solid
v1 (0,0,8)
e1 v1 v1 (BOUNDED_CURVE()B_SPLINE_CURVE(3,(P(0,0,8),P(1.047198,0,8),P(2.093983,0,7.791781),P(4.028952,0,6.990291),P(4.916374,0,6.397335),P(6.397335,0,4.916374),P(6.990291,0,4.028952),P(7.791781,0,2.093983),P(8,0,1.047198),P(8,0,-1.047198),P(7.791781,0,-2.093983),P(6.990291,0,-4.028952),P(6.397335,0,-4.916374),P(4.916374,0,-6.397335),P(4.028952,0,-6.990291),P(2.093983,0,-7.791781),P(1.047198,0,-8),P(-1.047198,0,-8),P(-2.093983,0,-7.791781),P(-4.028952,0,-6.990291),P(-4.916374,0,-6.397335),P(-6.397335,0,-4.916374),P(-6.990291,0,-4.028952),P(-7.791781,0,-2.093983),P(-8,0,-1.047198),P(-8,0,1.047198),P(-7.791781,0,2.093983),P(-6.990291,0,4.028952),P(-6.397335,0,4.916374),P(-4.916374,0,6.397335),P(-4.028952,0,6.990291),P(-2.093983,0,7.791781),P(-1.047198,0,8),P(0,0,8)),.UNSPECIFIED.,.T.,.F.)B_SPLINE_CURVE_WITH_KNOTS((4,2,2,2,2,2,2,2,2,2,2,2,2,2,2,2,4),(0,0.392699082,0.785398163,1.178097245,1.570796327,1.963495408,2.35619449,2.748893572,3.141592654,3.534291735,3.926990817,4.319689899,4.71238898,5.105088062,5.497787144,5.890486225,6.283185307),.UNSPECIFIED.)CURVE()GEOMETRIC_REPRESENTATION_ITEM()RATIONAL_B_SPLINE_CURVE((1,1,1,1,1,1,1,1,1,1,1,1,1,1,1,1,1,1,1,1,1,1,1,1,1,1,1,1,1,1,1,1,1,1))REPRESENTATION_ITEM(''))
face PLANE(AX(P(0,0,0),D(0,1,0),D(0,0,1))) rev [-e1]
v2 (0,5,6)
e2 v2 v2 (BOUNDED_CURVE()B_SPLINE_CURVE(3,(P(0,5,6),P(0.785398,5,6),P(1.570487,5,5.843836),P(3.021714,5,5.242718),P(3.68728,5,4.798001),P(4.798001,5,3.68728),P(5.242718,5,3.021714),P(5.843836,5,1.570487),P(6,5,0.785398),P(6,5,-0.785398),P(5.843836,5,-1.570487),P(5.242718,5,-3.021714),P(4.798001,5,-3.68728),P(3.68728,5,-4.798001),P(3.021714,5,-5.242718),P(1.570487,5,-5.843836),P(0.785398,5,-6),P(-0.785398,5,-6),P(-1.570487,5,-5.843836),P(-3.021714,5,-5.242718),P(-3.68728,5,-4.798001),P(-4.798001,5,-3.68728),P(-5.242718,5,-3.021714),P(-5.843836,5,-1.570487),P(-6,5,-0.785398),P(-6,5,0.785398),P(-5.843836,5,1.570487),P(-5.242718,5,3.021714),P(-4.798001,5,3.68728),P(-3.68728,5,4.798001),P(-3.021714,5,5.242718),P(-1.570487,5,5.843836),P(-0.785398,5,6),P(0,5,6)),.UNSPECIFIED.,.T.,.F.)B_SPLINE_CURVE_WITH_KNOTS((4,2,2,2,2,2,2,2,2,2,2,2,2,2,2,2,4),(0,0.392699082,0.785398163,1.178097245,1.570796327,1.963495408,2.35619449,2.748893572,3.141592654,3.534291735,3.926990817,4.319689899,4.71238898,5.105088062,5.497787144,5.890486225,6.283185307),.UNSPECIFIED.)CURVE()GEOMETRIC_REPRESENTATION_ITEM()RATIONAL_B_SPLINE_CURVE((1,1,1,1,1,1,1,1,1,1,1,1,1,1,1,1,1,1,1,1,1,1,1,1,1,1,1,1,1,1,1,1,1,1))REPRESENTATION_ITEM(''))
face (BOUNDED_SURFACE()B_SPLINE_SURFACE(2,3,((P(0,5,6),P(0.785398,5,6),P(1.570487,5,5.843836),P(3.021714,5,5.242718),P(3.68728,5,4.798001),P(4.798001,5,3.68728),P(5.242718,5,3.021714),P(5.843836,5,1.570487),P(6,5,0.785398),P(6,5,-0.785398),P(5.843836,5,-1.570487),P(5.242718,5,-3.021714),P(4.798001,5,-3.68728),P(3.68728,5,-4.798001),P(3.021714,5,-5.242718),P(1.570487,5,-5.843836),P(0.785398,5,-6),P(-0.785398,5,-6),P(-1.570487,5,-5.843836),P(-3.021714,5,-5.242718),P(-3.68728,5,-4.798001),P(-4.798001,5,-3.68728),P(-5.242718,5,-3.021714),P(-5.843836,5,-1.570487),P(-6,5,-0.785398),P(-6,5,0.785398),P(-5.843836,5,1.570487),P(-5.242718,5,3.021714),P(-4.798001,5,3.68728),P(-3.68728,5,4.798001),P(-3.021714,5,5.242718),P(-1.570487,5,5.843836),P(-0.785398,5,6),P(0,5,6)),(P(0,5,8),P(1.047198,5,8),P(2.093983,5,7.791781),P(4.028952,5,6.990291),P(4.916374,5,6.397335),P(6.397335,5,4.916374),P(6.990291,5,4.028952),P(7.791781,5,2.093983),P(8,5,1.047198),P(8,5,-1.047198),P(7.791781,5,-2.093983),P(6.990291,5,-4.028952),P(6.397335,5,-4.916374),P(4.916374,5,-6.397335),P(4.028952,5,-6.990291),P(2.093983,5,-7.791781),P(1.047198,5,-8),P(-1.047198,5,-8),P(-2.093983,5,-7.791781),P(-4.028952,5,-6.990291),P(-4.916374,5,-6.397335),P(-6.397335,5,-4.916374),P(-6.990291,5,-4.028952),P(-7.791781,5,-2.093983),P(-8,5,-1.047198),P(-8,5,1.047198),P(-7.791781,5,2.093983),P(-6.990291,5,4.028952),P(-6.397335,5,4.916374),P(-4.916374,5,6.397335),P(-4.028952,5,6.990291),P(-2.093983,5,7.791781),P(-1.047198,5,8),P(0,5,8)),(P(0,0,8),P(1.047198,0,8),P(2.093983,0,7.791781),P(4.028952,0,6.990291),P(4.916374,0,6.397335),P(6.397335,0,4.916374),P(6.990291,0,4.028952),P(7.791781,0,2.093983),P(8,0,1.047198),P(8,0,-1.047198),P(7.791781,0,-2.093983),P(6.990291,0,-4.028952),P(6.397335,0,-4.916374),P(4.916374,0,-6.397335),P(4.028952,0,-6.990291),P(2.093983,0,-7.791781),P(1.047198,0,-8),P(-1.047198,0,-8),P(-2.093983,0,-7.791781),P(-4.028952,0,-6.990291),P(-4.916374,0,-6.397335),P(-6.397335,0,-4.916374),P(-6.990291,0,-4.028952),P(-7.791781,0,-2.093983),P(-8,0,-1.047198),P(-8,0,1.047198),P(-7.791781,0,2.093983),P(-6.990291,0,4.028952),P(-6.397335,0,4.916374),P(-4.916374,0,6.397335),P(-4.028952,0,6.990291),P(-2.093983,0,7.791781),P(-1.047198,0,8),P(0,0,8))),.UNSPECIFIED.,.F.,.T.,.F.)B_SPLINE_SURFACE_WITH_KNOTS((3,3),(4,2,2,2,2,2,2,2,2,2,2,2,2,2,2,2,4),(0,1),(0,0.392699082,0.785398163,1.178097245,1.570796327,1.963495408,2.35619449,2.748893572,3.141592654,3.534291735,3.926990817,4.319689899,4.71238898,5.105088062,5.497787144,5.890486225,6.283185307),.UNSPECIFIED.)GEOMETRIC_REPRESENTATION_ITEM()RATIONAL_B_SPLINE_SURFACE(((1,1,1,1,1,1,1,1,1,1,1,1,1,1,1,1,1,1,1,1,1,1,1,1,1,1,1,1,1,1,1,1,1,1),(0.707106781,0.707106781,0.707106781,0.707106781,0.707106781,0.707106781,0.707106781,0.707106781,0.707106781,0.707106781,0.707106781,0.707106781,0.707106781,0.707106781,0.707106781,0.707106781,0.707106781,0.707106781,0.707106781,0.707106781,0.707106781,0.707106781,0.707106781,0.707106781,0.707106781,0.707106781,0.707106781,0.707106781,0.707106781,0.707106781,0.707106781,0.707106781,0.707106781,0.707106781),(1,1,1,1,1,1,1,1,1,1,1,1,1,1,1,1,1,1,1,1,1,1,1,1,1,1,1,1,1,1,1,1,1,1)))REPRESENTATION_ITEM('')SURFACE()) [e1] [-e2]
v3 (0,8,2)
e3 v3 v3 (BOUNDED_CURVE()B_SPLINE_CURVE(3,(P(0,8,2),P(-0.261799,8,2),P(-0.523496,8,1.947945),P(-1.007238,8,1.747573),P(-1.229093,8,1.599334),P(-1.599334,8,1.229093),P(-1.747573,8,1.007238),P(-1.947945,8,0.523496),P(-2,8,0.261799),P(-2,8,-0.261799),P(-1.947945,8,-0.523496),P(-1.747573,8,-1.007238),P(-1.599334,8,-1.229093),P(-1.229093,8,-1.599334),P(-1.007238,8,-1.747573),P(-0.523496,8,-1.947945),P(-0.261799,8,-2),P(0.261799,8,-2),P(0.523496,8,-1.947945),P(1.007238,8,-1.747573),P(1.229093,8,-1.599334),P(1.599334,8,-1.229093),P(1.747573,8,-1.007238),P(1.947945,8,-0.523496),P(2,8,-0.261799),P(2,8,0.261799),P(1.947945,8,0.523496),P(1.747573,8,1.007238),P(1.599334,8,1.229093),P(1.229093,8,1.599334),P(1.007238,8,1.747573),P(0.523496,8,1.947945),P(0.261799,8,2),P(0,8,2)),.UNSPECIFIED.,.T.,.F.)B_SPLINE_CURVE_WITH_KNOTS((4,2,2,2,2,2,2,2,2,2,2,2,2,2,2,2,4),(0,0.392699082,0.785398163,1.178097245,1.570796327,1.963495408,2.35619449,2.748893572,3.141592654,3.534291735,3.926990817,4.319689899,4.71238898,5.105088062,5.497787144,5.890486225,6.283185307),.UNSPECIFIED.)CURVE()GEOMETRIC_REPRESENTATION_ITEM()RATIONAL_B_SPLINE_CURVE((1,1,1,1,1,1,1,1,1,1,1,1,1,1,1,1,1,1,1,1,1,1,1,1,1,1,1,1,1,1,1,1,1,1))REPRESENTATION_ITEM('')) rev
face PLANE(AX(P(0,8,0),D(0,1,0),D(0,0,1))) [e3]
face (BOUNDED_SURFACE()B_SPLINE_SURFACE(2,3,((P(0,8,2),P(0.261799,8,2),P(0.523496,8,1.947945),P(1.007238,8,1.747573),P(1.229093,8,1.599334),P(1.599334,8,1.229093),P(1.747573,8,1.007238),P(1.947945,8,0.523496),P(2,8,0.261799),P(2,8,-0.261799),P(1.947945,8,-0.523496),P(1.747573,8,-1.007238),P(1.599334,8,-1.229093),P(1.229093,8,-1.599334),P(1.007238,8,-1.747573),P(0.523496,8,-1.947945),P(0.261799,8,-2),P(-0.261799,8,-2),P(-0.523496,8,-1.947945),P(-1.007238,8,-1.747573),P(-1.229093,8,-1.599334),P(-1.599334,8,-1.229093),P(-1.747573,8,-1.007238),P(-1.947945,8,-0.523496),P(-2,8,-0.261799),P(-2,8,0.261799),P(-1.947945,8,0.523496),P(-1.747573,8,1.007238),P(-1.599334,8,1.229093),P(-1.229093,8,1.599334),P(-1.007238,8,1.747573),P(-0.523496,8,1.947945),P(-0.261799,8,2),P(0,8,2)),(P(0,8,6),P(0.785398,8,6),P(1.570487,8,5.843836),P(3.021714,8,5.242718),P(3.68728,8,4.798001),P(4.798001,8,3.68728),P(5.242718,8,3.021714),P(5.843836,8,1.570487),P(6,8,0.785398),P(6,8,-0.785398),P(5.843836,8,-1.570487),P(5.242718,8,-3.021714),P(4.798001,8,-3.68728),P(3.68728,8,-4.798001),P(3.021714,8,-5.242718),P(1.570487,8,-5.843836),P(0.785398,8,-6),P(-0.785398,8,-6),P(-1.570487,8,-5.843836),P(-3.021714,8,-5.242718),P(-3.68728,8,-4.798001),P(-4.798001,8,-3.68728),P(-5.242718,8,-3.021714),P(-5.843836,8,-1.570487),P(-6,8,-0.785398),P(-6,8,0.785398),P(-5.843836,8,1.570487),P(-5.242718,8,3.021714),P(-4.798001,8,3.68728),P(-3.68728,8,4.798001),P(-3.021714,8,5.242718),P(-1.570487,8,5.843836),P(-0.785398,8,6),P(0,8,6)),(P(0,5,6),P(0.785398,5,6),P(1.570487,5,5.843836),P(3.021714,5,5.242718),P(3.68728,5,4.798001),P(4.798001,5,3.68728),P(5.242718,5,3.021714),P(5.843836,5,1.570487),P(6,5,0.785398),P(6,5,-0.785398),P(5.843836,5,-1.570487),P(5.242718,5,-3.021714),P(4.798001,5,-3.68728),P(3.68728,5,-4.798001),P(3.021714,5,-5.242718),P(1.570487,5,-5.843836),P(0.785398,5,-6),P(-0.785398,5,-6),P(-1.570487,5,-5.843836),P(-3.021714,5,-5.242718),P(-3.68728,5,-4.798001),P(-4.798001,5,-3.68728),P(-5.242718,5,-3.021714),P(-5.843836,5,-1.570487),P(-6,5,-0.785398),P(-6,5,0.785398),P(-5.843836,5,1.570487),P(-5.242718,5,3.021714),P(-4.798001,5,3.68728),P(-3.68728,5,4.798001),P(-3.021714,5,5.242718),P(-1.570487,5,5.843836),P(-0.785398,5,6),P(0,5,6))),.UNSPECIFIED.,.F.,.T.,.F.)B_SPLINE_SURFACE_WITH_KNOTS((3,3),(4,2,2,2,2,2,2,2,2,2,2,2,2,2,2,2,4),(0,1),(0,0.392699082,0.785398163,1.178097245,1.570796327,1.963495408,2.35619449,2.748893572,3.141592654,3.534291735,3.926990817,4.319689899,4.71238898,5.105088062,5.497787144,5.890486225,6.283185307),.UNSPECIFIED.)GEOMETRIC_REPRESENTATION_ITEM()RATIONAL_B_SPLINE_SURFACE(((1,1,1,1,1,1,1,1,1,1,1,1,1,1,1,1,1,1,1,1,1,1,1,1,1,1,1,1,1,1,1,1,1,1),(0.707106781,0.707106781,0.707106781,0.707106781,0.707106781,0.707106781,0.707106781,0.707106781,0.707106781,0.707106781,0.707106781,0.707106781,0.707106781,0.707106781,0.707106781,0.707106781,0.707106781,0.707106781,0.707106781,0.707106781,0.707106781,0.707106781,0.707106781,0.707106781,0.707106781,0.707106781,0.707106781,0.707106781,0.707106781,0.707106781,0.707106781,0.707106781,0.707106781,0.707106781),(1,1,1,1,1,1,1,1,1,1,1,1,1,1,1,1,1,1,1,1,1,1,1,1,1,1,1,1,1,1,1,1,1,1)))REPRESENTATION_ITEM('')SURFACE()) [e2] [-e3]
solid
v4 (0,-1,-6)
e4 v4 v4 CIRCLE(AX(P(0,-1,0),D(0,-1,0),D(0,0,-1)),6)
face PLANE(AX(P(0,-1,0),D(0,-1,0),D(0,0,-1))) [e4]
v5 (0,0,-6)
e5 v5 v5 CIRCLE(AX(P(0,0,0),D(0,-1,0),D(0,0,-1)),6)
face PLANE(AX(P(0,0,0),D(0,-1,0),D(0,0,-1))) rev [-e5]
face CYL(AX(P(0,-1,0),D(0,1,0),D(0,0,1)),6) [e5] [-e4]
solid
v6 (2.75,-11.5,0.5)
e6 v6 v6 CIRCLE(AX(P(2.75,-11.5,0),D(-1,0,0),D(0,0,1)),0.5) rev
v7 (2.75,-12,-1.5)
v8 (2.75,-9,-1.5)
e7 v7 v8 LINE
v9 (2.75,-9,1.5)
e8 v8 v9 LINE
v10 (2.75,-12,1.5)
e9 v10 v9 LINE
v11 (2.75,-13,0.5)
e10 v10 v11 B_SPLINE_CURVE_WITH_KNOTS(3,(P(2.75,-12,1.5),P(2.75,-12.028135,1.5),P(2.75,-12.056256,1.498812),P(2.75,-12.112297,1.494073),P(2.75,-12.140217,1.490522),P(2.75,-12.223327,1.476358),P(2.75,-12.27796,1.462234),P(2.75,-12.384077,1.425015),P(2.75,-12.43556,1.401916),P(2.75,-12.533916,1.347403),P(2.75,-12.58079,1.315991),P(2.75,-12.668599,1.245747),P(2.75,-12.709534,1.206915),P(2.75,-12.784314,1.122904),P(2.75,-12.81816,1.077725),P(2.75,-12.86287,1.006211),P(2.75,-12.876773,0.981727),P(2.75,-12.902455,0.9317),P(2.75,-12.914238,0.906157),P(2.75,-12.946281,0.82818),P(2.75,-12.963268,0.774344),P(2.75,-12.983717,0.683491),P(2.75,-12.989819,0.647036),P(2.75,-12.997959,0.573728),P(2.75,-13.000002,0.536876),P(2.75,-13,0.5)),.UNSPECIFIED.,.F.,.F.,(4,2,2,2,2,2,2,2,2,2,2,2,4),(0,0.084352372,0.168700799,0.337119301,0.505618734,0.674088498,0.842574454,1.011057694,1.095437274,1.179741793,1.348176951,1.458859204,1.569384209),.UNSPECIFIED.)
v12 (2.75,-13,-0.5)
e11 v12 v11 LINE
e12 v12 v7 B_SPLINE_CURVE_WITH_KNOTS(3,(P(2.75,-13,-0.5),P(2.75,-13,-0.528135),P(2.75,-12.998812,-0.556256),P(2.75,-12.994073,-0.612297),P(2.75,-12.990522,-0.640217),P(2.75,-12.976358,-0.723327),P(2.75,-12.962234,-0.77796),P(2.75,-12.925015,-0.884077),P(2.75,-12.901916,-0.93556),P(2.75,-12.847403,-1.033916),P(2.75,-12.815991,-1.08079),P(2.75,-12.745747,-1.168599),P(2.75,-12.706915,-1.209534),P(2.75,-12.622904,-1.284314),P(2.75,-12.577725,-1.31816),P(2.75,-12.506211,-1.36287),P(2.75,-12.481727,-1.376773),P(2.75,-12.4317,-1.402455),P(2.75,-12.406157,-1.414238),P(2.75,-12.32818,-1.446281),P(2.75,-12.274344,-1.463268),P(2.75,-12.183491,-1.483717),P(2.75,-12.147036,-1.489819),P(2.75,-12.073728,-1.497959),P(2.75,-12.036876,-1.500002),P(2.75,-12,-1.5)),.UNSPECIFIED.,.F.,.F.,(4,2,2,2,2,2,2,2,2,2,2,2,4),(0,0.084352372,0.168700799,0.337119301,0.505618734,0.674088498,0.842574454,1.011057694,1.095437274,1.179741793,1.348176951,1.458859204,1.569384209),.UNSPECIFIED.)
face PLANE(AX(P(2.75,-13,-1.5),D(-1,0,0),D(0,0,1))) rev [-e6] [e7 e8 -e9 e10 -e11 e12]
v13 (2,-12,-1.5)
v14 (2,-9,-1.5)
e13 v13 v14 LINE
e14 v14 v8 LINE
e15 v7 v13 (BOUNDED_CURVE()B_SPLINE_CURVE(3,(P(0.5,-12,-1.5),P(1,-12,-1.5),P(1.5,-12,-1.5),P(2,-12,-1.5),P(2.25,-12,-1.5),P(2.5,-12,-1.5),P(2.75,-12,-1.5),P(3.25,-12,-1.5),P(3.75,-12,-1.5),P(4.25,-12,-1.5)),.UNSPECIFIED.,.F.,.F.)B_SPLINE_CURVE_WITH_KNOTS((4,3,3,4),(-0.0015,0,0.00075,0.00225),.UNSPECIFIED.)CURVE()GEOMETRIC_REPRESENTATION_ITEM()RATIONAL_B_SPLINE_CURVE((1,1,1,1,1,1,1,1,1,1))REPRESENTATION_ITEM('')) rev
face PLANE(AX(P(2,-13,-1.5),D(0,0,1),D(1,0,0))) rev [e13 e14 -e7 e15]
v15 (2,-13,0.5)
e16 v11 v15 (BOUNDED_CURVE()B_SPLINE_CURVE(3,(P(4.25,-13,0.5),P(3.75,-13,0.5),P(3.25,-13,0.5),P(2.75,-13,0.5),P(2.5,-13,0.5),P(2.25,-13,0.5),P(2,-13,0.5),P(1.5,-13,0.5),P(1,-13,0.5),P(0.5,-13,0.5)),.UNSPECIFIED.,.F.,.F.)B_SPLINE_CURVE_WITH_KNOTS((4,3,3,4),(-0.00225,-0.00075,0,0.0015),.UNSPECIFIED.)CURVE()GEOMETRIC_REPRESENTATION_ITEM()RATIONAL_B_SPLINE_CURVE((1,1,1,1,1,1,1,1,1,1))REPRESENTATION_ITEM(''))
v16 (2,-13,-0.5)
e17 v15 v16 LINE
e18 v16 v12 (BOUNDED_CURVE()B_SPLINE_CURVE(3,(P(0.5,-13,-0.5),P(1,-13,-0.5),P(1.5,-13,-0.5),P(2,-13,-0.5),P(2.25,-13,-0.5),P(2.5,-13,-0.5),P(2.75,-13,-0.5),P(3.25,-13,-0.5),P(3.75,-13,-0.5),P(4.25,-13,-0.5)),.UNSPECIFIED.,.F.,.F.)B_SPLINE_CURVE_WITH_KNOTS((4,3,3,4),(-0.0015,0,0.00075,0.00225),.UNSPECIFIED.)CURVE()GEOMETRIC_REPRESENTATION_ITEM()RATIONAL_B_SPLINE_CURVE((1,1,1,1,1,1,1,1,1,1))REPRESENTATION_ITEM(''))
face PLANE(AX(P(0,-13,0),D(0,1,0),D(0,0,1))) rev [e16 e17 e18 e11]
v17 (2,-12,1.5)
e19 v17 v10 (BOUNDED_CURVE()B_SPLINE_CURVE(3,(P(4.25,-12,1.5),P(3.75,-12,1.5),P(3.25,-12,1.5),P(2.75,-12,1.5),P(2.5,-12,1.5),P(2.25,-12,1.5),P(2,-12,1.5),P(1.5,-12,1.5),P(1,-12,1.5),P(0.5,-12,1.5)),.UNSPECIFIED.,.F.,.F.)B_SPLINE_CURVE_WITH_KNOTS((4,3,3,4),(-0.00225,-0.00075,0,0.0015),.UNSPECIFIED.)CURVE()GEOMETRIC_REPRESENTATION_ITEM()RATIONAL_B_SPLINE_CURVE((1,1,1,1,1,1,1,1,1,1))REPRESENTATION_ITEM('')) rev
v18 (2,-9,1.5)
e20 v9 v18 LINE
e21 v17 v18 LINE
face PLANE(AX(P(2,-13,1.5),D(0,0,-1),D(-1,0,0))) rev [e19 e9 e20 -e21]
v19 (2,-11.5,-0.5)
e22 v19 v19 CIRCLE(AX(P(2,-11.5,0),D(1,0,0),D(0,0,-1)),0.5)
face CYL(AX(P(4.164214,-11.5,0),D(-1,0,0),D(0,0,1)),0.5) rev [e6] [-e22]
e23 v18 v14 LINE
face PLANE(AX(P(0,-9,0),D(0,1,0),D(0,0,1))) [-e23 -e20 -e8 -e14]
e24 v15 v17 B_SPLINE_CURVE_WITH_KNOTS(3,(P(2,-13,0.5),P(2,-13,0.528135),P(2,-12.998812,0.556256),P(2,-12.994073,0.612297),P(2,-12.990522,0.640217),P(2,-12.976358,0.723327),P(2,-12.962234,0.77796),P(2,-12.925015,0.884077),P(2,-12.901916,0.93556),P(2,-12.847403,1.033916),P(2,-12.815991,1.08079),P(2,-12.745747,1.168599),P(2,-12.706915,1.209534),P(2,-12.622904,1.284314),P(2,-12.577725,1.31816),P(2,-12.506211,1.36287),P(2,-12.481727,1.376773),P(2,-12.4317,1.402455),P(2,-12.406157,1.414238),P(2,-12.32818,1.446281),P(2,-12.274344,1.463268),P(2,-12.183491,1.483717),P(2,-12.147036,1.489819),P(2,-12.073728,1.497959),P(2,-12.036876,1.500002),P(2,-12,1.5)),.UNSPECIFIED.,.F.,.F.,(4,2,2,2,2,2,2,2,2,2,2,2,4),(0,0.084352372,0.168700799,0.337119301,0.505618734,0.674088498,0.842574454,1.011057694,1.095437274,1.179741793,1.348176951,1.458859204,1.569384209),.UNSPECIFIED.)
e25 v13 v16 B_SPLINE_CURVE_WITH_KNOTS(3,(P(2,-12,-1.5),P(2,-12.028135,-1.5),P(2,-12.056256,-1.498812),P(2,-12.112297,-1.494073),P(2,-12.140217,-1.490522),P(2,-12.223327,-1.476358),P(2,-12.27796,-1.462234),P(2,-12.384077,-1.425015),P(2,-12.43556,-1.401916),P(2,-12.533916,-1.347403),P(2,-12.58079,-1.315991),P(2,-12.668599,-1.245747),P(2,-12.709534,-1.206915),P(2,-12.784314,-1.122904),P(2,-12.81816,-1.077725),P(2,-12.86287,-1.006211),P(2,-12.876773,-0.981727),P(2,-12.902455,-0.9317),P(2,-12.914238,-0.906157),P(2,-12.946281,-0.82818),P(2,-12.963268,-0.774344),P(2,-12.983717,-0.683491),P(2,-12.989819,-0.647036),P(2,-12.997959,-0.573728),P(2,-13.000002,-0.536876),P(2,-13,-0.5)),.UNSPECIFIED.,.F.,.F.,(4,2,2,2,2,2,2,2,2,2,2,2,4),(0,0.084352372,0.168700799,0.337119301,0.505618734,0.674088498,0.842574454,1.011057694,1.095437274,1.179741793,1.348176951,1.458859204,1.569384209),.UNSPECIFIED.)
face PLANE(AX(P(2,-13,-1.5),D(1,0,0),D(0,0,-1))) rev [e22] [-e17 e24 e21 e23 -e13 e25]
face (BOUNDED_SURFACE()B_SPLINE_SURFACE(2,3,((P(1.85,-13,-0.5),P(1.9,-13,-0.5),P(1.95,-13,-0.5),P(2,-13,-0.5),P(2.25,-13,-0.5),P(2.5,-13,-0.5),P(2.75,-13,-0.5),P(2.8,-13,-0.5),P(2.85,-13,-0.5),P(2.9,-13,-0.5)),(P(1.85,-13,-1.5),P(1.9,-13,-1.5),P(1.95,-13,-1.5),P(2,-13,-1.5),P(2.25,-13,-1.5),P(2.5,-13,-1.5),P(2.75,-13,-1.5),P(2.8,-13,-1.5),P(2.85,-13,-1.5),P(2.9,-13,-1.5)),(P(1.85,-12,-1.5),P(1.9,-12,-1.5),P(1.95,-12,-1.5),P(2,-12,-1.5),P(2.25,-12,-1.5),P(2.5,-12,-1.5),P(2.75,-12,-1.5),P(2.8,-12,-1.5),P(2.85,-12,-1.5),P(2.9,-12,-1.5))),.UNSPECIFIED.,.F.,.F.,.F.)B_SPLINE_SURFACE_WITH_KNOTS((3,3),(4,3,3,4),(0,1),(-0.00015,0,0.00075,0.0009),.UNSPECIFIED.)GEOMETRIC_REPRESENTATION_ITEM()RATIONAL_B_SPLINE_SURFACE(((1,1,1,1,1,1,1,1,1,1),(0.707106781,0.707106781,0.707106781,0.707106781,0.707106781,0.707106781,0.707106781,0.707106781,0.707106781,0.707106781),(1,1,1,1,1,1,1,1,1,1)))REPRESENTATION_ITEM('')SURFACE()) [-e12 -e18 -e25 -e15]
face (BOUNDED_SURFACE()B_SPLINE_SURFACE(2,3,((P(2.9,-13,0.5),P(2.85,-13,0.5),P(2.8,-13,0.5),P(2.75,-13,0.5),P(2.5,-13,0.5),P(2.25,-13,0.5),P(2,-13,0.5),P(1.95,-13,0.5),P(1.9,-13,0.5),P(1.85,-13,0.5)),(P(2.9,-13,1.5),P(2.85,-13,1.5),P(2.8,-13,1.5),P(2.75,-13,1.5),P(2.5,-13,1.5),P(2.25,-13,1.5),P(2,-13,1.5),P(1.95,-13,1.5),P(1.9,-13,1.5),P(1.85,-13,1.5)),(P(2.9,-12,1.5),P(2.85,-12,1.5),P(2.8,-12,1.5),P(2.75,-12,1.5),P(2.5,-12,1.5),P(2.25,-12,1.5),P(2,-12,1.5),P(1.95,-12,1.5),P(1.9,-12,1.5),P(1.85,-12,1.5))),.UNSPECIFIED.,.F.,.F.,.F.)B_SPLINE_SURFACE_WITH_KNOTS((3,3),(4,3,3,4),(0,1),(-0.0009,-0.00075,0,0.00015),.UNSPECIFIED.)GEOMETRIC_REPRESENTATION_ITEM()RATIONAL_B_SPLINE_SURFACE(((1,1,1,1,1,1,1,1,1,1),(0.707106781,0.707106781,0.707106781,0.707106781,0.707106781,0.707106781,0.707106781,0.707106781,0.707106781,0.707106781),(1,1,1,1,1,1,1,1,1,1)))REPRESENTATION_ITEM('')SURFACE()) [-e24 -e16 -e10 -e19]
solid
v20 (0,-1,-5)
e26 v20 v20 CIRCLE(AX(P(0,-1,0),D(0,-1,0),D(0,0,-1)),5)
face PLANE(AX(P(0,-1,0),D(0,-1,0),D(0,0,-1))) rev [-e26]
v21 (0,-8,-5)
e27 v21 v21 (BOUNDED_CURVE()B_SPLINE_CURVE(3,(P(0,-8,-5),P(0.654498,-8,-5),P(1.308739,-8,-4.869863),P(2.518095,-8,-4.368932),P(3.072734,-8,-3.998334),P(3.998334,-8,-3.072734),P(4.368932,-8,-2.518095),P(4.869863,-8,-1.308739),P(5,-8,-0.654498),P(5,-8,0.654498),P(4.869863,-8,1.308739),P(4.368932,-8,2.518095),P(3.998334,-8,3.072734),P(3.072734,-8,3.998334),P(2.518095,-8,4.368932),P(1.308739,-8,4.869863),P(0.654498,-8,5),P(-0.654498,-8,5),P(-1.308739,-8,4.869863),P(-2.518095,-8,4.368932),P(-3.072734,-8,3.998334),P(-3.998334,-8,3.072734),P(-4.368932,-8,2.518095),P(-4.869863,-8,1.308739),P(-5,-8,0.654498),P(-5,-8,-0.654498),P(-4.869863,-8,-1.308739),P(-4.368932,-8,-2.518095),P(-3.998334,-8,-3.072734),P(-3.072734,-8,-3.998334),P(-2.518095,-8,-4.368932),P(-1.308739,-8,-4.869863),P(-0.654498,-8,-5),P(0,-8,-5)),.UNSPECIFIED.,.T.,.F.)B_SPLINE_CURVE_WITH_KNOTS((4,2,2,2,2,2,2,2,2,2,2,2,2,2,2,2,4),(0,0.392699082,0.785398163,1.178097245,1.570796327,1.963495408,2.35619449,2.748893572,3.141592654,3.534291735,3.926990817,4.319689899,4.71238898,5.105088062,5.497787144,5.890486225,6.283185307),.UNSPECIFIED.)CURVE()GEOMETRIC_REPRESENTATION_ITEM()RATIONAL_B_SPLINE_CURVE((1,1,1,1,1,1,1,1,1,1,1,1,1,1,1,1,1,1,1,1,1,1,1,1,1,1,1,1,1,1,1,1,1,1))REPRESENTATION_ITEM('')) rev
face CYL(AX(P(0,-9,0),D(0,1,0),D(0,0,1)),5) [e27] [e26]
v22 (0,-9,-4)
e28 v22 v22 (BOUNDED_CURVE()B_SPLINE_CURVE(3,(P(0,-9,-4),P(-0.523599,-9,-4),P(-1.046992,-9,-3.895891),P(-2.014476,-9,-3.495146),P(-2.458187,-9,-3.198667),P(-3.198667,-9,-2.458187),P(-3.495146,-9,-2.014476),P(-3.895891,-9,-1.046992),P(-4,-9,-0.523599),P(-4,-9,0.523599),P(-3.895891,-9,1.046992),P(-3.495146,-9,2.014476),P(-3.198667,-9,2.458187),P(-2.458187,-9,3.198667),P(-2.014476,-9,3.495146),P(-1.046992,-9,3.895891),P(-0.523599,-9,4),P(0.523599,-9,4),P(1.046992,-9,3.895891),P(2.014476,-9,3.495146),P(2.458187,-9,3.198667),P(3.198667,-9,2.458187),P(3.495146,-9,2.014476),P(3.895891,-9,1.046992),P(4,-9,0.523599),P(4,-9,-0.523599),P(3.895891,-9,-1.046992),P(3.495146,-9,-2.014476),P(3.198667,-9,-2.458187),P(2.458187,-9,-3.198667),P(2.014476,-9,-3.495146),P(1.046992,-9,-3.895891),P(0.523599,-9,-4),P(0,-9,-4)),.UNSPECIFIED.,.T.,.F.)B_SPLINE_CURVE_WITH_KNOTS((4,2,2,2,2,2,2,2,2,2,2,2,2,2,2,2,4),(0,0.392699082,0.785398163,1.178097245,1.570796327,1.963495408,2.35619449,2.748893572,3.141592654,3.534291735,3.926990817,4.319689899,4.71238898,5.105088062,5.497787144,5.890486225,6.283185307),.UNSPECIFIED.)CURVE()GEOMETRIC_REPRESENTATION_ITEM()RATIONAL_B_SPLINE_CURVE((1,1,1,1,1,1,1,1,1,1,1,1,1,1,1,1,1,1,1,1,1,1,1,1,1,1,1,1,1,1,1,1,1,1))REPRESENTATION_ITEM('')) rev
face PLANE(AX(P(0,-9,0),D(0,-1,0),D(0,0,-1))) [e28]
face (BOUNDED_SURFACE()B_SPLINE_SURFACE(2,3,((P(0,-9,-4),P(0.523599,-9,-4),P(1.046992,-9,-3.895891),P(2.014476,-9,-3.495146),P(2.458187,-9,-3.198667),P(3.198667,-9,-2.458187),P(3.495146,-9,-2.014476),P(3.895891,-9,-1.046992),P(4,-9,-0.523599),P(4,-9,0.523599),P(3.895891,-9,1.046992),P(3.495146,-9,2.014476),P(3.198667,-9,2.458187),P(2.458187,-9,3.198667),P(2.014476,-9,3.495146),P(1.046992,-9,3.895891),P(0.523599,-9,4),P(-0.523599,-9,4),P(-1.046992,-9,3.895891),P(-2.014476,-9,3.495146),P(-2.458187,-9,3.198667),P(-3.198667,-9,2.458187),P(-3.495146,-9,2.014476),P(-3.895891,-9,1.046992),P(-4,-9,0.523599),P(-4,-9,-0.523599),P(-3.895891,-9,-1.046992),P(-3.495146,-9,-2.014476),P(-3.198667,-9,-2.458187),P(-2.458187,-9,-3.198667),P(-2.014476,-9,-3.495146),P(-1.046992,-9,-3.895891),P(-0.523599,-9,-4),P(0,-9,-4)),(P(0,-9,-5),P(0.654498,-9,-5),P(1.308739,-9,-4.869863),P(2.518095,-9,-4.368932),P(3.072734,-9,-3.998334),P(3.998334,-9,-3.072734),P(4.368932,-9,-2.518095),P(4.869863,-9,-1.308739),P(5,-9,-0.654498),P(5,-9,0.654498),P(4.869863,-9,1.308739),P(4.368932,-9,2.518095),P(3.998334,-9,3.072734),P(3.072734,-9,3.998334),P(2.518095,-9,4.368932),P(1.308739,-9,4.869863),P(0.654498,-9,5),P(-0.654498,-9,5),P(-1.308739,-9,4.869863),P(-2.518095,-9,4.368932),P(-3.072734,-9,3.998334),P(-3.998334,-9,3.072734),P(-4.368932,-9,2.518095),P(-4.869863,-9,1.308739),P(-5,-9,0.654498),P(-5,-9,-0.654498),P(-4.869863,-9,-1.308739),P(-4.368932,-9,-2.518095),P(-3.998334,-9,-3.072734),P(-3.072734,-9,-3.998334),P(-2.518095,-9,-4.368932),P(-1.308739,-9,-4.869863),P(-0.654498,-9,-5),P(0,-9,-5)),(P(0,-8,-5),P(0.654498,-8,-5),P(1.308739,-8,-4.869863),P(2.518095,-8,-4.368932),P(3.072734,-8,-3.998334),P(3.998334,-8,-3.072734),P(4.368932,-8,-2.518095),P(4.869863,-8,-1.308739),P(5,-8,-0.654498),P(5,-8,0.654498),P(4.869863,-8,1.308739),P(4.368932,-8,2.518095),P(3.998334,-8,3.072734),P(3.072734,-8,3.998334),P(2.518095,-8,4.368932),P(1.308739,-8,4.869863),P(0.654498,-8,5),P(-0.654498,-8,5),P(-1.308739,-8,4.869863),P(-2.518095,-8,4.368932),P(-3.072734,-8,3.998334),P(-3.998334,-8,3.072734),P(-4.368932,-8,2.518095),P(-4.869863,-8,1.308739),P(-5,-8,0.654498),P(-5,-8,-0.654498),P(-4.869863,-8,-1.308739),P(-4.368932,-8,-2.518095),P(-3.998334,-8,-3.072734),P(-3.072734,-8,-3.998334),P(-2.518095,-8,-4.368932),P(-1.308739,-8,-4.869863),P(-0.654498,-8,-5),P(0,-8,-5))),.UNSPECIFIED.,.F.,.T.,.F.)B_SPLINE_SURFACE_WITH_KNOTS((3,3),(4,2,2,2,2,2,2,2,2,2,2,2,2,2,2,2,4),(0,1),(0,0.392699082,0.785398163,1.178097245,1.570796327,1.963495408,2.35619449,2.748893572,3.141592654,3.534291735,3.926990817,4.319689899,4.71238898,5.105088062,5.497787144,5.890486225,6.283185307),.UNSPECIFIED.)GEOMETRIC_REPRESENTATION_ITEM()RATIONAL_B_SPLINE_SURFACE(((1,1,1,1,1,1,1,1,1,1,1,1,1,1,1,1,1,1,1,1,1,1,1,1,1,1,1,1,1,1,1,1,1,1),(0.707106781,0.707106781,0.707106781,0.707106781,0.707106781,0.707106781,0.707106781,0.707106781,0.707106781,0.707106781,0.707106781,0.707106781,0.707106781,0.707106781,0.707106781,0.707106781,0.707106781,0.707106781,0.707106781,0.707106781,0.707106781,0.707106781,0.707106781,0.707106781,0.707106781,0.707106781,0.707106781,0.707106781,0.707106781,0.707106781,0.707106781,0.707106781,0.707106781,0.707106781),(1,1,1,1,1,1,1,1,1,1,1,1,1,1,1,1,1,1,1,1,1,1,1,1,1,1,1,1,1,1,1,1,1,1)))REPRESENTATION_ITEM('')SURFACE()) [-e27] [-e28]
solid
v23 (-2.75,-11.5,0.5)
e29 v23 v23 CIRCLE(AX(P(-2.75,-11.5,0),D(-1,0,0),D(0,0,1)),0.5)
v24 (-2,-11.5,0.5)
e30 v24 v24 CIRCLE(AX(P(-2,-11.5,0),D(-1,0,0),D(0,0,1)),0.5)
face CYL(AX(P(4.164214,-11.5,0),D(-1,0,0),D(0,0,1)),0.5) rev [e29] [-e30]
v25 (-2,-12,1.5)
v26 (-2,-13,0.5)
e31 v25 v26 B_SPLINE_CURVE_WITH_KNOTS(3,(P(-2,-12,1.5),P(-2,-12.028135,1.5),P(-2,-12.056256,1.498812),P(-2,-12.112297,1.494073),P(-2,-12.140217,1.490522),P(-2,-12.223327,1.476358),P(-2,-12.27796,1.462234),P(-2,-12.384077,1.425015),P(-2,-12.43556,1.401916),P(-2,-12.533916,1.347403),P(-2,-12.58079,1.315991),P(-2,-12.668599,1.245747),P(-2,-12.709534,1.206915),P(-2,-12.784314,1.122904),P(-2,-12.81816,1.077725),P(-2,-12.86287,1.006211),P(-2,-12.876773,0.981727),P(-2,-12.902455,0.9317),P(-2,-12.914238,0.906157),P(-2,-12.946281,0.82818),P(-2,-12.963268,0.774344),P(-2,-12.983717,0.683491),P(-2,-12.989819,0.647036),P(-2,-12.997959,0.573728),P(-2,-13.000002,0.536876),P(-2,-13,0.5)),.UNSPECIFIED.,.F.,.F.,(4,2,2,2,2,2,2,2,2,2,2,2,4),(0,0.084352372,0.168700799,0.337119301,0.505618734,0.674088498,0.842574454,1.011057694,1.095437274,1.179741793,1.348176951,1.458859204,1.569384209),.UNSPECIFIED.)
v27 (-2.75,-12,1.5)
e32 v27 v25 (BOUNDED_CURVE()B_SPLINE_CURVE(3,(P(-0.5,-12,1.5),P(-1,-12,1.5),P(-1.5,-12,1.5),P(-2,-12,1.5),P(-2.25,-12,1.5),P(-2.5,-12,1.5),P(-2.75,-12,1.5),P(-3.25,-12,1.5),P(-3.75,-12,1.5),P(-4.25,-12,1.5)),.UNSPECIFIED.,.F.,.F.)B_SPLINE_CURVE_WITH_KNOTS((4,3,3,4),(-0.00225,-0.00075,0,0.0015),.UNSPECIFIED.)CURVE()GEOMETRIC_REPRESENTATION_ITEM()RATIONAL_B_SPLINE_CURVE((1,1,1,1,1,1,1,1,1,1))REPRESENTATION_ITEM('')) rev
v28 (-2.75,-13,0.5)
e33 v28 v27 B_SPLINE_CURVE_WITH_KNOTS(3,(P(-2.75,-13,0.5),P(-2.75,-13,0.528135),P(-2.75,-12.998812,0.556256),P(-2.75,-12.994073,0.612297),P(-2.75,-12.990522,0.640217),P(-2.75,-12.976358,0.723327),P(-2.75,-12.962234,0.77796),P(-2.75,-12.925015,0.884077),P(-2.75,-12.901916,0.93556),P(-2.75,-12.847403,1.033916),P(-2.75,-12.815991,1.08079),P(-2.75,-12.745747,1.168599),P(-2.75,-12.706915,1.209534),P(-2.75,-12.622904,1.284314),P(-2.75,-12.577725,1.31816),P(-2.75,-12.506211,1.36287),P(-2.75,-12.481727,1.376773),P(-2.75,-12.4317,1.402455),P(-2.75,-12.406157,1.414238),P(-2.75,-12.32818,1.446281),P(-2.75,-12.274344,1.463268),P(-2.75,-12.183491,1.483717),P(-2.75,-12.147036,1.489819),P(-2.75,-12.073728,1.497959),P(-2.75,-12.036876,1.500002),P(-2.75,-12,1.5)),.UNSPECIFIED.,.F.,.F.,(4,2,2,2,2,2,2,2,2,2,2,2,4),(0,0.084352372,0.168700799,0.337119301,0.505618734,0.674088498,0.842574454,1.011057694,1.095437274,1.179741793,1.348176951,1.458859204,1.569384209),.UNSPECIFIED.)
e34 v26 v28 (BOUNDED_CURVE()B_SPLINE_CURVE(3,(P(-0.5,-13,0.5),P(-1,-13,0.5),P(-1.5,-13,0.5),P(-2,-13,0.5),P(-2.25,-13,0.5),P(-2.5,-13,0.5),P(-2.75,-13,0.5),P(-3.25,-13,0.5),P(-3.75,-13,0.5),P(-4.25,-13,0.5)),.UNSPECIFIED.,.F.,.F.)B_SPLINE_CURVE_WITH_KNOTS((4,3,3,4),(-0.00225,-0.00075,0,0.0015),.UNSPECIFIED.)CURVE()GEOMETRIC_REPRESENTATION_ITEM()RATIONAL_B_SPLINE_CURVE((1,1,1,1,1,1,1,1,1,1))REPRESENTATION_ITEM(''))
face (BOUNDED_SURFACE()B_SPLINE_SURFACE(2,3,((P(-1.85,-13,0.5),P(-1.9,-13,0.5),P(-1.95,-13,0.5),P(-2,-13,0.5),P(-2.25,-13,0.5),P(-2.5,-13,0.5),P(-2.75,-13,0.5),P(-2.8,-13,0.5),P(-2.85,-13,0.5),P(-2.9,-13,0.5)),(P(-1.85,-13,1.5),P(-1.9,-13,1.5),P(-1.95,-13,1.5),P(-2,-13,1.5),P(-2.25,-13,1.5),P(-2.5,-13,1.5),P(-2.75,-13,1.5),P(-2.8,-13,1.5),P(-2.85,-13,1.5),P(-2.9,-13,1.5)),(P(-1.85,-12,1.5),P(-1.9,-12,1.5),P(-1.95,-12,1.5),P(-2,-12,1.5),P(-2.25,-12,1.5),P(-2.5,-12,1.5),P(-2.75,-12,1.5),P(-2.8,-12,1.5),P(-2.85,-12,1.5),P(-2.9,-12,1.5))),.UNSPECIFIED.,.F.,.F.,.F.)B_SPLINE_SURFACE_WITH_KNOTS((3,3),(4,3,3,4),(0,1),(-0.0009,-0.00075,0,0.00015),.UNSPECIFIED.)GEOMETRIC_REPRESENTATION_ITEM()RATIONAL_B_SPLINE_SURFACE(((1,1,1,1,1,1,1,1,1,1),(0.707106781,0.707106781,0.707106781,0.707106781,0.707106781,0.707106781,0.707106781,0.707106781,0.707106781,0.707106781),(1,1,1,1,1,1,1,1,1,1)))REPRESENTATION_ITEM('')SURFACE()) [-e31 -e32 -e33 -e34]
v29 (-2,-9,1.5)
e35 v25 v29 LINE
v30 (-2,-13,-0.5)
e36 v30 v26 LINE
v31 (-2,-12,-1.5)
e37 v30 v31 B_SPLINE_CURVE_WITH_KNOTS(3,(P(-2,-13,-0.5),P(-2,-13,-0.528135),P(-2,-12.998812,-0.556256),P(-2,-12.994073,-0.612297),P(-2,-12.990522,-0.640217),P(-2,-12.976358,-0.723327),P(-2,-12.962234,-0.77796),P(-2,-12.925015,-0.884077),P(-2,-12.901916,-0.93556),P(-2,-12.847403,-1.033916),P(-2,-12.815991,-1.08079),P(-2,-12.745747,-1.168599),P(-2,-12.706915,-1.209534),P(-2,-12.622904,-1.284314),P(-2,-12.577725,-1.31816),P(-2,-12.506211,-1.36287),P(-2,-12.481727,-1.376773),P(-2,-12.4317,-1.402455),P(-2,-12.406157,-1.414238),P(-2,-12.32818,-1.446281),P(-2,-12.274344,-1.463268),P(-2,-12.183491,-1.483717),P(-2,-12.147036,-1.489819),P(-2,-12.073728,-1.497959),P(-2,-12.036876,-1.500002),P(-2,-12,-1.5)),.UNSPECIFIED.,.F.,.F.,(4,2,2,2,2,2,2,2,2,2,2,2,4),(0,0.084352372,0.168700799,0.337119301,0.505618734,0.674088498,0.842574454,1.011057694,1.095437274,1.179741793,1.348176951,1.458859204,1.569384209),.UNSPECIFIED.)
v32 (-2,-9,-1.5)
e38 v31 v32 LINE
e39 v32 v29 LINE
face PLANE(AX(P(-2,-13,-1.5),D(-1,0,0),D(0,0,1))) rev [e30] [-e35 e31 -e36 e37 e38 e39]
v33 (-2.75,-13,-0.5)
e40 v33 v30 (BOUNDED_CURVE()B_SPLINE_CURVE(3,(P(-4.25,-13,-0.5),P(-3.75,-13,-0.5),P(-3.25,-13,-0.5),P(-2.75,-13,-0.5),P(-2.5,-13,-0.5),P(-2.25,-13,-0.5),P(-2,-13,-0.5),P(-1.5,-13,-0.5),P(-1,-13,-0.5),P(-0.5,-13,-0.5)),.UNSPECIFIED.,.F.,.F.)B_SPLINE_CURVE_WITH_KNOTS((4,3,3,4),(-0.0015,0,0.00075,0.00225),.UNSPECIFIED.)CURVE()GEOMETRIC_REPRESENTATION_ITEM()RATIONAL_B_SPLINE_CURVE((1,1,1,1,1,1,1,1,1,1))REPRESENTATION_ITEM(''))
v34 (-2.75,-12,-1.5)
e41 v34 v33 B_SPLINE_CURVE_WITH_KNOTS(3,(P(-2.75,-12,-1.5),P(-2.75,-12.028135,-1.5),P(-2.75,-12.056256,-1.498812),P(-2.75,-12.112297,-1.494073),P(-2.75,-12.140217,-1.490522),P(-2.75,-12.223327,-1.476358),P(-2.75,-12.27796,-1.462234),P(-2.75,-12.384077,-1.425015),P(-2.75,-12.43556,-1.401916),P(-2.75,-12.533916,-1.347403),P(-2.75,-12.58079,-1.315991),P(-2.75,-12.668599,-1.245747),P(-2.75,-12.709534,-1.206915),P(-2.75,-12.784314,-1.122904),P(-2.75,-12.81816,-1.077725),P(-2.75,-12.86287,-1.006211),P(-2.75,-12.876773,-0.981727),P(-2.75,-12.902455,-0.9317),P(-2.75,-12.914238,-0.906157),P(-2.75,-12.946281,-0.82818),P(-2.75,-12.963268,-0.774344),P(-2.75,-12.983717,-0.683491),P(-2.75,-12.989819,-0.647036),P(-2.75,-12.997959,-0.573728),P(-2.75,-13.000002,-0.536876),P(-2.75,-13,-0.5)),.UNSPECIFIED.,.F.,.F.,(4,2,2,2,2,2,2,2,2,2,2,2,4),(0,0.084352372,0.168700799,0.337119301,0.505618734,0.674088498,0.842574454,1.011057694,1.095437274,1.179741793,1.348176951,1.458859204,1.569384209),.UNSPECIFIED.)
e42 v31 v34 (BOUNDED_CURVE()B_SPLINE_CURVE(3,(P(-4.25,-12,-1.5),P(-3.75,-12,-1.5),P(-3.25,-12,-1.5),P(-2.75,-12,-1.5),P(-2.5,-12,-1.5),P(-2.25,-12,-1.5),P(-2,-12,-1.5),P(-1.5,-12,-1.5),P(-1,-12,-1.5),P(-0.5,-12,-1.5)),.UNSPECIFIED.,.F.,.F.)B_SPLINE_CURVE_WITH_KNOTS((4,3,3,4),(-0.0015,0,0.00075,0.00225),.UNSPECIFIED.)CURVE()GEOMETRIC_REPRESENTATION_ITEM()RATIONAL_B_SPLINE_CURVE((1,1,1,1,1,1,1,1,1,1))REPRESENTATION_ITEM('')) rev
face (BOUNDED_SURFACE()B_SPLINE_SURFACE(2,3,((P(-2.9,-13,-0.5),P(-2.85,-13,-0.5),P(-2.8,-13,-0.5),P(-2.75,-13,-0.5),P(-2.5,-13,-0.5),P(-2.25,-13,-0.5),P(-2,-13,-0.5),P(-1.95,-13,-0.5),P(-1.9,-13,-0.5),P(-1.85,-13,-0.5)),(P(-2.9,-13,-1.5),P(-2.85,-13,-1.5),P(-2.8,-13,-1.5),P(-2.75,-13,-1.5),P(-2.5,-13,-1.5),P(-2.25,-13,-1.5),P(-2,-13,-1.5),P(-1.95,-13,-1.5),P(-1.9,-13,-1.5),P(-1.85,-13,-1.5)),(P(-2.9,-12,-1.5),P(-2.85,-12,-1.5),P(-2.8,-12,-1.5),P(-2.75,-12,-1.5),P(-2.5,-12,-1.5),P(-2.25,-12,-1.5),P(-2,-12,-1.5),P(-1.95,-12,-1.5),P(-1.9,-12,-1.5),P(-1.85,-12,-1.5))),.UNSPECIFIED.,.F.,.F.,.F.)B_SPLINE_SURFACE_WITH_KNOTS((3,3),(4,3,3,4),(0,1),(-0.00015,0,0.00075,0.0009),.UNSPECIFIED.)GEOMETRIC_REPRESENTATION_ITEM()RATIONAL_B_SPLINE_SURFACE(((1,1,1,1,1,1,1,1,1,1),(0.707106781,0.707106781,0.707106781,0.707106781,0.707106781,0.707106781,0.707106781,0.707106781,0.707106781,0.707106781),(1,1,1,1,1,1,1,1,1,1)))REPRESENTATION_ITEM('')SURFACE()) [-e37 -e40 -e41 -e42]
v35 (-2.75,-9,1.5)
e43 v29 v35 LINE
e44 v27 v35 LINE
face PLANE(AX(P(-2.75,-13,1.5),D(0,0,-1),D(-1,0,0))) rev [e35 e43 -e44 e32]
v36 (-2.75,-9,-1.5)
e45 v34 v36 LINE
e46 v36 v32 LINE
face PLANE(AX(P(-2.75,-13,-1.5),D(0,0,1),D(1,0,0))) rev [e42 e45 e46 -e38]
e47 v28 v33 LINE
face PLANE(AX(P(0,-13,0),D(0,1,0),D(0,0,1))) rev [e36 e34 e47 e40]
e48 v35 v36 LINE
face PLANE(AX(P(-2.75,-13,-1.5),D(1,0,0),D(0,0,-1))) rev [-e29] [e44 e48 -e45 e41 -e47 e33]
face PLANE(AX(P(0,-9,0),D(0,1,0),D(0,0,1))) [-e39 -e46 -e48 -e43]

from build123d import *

# Parameters (mm, degrees)
SKETCH1_R             = 8
BOSS_EXTRUDE1_DEPTH   = 5
FILLET2_SIZE          = 5
FILLET2_SIZE_2        = 2
SKETCH2_R             = 6
BOSS_EXTRUDE2_DEPTH   = 3
FILLET3_SIZE          = 3
FILLET3_SIZE_2        = 4
SKETCH3_R             = 6
BOSS_EXTRUDE3_DEPTH   = 1
SKETCH4_R             = 5
BOSS_EXTRUDE4_DEPTH   = 8
FILLET4_R             = 1
SKETCH5_W             = 0.75
SKETCH5_H             = 3
BOSS_EXTRUDE5_DEPTH   = 4
BOSS_EXTRUDE5_2_DEPTH = 4
FILLET5_START         = -4
FILLET5_DEPTH         = 3
FILLET6_START         = 1
FILLET6_DEPTH         = 3
CUT_EXTRUDE1_START    = -10.75
SKETCH6_R             = 0.5
CUT_EXTRUDE1_DEPTH    = 16


with BuildPart() as part:
    # Sketch1 → Boss-Extrude1 (new body)
    with BuildSketch(Plane(origin=(0, 0, 0), x_dir=(1, 0, 0), z_dir=(0, 1, 0))):
        with Locations(Location((0, 0, 0), (0, 0, 270))):
            Circle(SKETCH1_R)
    extrude(amount=BOSS_EXTRUDE1_DEPTH)

    # Fillet2
    # a fillet whose section is not a circle: 5, 2 mm, written as the material it takes off along each edge
    with BuildSketch(Plane(origin=(0, 5, 0), x_dir=(0, 0, 1), z_dir=(-1, 0, 0))) as fillet2_piece_1:
        with BuildLine():
            Bezier((8, -FILLET2_SIZE), (8, 0), (8 - FILLET2_SIZE_2, 0), weights=[1, 0.707106781, 1])
            Line((8 - FILLET2_SIZE_2, 0), (8, 0))
            Line((8, 0), (8, -FILLET2_SIZE))
        make_face()
    revolve(axis=Axis((0, 5, 0), (0, 1, 0)), mode=Mode.SUBTRACT)

    # Sketch2 → Boss-Extrude2 (add)
    with BuildSketch(Plane(origin=(0, 5, 0), x_dir=(1, 0, 0), z_dir=(0, 1, 0))):
        with Locations(Location((0, 0, 0), (0, 0, 270))):
            Circle(SKETCH2_R)
    extrude(amount=BOSS_EXTRUDE2_DEPTH)

    # Fillet3
    # a fillet whose section is not a circle: 4, 3 mm, written as the material it takes off along each edge
    with BuildSketch(Plane(origin=(0, 8, 0), x_dir=(0, 0, 1), z_dir=(-1, 0, 0))) as fillet3_piece_1:
        with BuildLine():
            Bezier((6, -FILLET3_SIZE), (6, 0), (6 - FILLET3_SIZE_2, 0), weights=[1, 0.707106781, 1])
            Line((6 - FILLET3_SIZE_2, 0), (6, 0))
            Line((6, 0), (6, -FILLET3_SIZE))
        make_face()
    revolve(axis=Axis((0, 8, 0), (0, 1, 0)), mode=Mode.SUBTRACT)


with BuildPart() as body_2:
    # Sketch3 → Boss-Extrude3 (new body)
    with BuildSketch(Plane.XZ):
        with Locations(Location((0, 0, 0), (0, 0, 270))):
            Circle(SKETCH3_R)
    extrude(amount=BOSS_EXTRUDE3_DEPTH)


with BuildPart() as body_3:
    # Sketch4 → Boss-Extrude4 (new body)
    with BuildSketch(Plane.XZ.offset(1)):
        with Locations(Location((0, 0, 0), (0, 0, 270))):
            Circle(SKETCH4_R)
    extrude(amount=BOSS_EXTRUDE4_DEPTH)

    # Fillet4
    fillet4_edges = [body_3.edges().sort_by_distance(p)[0] for p in [
        (0, -9, 5),
    ]]
    fillet(fillet4_edges, radius=FILLET4_R)


with BuildPart() as body_4:
    # Sketch5 → Boss-Extrude5 (new body)
    with BuildSketch(Plane.XZ.offset(9)):
        with Locations((-2.375, 0)):
            Rectangle(SKETCH5_W, SKETCH5_H)
    extrude(amount=BOSS_EXTRUDE5_DEPTH)

    # Fillet5: read off the stored shape, not the designer's step
    # Fillet5 outline → Fillet5 (cut)
    with BuildSketch(Plane.YZ.offset(FILLET5_START)):
        with BuildLine():
            add(Edge.make_bspline(
                [(-13, -0.5), (-13, -1.5), (-12, -1.5)],
                knots=[0, 0, 0, 1, 1, 1], degree=2, weights=[1, 0.707106781, 1]))
            Line((-13, -0.5), (-13, -1.5))
            Line((-13, -1.5), (-12, -1.5))
        make_face()
        with BuildLine():
            Line((-13, 1.5), (-13, 0.5))
            add(Edge.make_bspline(
                [(-13, 0.5), (-13, 1.5), (-12, 1.5)],
                knots=[0, 0, 0, 1, 1, 1], degree=2, weights=[1, 0.707106781, 1]))
            Line((-12, 1.5), (-13, 1.5))
        make_face()
    extrude(amount=FILLET5_DEPTH, mode=Mode.SUBTRACT)


with BuildPart() as body_5:
    # Sketch5 → Boss-Extrude5 2 (new body)
    with BuildSketch(Plane.XZ.offset(9)):
        with Locations((2.375, 0)):
            Rectangle(SKETCH5_W, SKETCH5_H)
    extrude(amount=BOSS_EXTRUDE5_2_DEPTH)

    # Fillet6: read off the stored shape, not the designer's step
    # Fillet6 outline → Fillet6 (cut)
    with BuildSketch(Plane.YZ.offset(FILLET6_START)):
        with BuildLine():
            add(Edge.make_bspline(
                [(-13, -0.5), (-13, -1.5), (-12, -1.5)],
                knots=[0, 0, 0, 1, 1, 1], degree=2, weights=[1, 0.707106781, 1]))
            Line((-13, -0.5), (-13, -1.5))
            Line((-13, -1.5), (-12, -1.5))
        make_face()
        with BuildLine():
            Line((-13, 1.5), (-13, 0.5))
            add(Edge.make_bspline(
                [(-13, 0.5), (-13, 1.5), (-12, 1.5)],
                knots=[0, 0, 0, 1, 1, 1], degree=2, weights=[1, 0.707106781, 1]))
            Line((-12, 1.5), (-13, 1.5))
        make_face()
    extrude(amount=FILLET6_DEPTH, mode=Mode.SUBTRACT)


with BuildPart() as cut_extrude1_tool:
    # Sketch6 → Cut-Extrude1 (new body)
    with BuildSketch(Plane.ZY.offset(2.75).offset(CUT_EXTRUDE1_START)):
        with Locations((0, -11.5)):
            Circle(SKETCH6_R)
    extrude(amount=CUT_EXTRUDE1_DEPTH)


with BuildPart() as body_4_1:
    add(body_4.part)

    # Cut-Extrude1: cut by cut_extrude1_tool
    add(cut_extrude1_tool.part, mode=Mode.SUBTRACT)


with BuildPart() as body_5_1:
    add(body_5.part)

    # Cut-Extrude1: cut by cut_extrude1_tool
    add(cut_extrude1_tool.part, mode=Mode.SUBTRACT)


solid = Compound([part.part, body_2.part, body_3.part, body_4_1.part, body_5_1.part])
